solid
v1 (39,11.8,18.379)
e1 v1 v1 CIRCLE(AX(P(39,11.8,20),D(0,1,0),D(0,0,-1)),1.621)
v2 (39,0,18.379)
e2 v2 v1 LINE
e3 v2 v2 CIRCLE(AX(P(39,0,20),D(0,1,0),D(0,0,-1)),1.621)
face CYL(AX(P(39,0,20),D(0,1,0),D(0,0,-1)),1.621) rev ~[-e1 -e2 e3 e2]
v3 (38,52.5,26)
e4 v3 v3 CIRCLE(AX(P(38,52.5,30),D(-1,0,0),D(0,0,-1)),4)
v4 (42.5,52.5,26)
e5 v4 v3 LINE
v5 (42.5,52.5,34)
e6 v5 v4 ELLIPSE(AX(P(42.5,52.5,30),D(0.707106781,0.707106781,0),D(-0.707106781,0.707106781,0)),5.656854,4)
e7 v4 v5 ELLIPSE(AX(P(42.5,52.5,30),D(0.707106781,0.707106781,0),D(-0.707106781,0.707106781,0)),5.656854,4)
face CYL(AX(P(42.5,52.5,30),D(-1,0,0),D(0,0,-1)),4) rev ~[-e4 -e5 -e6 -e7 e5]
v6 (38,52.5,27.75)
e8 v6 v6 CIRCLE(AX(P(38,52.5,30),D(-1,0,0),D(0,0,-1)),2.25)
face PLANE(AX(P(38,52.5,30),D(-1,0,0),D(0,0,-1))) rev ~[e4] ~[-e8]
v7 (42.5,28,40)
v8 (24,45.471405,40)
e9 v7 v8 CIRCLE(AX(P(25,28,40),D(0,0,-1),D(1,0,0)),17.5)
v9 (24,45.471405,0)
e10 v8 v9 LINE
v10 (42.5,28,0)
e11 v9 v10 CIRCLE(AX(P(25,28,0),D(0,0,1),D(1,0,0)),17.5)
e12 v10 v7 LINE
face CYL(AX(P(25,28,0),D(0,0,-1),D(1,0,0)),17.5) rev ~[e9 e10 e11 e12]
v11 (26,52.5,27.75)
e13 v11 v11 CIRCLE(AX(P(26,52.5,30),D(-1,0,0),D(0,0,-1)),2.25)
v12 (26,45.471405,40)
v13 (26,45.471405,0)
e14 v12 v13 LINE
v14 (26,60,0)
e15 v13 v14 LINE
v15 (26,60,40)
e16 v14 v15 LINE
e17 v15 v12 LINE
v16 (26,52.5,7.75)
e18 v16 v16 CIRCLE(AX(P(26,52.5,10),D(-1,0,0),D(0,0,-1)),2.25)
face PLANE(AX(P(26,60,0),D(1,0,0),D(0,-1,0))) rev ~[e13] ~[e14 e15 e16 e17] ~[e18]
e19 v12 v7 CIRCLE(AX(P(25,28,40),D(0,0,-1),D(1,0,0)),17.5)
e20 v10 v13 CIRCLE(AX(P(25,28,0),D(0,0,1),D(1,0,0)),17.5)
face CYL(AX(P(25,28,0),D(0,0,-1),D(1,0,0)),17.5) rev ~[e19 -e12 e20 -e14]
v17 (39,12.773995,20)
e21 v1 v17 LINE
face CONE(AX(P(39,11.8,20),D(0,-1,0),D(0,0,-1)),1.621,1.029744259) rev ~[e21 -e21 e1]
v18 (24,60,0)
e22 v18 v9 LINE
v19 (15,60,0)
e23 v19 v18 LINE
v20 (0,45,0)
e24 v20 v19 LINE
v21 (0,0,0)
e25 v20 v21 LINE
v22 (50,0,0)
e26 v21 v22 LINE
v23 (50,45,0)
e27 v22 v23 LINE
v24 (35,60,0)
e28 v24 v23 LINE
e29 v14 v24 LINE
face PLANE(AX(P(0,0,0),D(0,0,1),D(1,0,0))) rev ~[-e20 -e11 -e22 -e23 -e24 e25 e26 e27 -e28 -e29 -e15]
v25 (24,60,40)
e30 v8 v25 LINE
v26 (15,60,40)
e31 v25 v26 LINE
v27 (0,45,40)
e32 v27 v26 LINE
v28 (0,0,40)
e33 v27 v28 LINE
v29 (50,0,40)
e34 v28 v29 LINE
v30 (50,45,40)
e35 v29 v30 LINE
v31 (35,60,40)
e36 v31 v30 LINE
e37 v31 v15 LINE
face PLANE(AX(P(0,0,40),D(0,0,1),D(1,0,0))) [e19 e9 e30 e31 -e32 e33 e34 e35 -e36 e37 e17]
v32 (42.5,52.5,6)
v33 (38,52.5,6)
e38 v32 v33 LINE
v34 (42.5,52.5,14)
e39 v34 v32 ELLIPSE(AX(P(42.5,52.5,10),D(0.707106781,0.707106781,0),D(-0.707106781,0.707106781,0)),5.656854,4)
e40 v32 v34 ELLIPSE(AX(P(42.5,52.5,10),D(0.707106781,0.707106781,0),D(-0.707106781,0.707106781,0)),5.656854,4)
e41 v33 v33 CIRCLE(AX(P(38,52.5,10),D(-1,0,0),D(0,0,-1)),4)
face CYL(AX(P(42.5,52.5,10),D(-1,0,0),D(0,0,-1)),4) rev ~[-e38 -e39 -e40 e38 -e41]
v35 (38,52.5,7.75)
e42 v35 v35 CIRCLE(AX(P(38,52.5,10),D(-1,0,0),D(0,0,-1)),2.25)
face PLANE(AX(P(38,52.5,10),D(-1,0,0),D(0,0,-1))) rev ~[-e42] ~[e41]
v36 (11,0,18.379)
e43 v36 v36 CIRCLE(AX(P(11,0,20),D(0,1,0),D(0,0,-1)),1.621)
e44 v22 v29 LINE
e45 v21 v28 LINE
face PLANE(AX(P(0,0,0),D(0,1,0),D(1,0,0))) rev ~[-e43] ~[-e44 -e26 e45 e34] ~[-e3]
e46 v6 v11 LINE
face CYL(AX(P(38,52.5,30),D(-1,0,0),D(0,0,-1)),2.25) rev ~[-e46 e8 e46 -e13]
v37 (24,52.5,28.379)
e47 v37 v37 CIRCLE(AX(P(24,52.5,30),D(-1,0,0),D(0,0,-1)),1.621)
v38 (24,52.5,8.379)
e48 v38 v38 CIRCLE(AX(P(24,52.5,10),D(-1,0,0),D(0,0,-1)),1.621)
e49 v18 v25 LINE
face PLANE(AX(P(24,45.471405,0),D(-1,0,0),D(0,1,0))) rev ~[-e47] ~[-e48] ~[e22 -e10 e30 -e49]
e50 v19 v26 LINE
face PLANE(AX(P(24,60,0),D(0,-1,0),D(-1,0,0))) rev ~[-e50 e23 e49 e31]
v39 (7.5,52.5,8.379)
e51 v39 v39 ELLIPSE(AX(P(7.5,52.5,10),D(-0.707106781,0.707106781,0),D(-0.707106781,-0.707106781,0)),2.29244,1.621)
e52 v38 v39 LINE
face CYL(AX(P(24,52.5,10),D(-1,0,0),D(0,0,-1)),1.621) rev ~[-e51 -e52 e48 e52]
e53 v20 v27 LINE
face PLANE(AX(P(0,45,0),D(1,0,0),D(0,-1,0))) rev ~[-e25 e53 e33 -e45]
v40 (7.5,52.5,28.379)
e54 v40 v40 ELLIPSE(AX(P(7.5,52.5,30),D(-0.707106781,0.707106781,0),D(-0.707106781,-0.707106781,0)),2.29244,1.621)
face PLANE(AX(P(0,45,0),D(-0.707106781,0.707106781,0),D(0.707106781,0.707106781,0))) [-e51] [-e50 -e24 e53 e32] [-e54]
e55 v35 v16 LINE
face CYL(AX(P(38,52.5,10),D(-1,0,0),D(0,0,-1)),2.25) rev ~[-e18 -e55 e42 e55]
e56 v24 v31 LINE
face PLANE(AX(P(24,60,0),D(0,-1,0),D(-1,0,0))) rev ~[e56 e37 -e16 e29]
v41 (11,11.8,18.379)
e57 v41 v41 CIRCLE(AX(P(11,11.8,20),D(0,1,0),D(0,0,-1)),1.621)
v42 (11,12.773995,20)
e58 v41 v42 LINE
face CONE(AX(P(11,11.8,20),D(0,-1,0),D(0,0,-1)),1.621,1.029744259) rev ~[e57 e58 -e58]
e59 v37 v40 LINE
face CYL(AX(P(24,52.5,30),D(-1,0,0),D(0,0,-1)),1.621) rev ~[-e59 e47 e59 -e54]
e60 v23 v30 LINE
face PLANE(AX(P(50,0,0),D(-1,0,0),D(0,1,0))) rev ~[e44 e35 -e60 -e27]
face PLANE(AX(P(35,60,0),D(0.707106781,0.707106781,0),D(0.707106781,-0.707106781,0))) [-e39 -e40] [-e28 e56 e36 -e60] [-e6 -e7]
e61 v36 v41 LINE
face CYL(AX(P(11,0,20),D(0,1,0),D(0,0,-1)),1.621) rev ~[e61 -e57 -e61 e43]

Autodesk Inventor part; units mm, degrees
sketch "Skizze1" plane through (0, 0, 0) normal (0, 0, 1) x (1, 0, 0)
  line L0 (0, 0) -> (50, 0)
  line L1 (50, 0) -> (50, 45)
  line L2 (35, 60) -> (15, 60)
  line L3 (0, 45) -> (0, 0)
  circle A0 centre (25, 28) radius 17.5
  line L4 (25, 28) -> (25, 0) construction
  line L5 (0, 45) -> (15, 60)
  line L6 (35, 60) -> (50, 45)
  line L7 (24, 60) -> (26, 60)
  line L8 (26, 60) -> (26, 28)
  line L9 (26, 28) -> (24, 28)
  line L10 (24, 28) -> (24, 60)
  point P0 (50, 60)
  point P1 (0, 60)
  point P2 (25, 60)
  dimension "d0" = 50
  dimension "d1" = 35
  dimension "d2" = 60
  dimension "d3" = 15
  dimension "d4" = 15
  dimension "d5" = 15
  dimension "d6" = 15
  dimension "d7" = 28
  dimension "d10" = 2
extrude "Extrusion1" add sketch "Skizze1" along normal blind 40 contours L3 L5 L2 L10 A0 L8 L6 L1 L0 | L2 L8 A0 L10
extrude "Extrusion2" cut sketch "Skizze1" along normal up to surface (40 mm away) contours L2 L8 A0 L10 | A0 L8 L9 L10 picked at (24.8888, 33.8323)
sketch "Skizze2" plane through (0, 0, 0) normal (0, -1, 0) x (1, 0, 0)
  line L0 (0, 0) -> (0, 40) construction
  line L1 (50, 0) -> (50, 40) construction
  line L2 (0, 40) -> (50, 40) construction
  line L3 (0, 0) -> (0, 40) construction
  line L4 (25, 20) -> (25, 40) construction
  line L5 (7.5, 40) -> (42.5, 40) construction
  line L6 (11, 20) -> (39, 20) construction
  point P0 (26, 40)
  point P1 (24, 40)
  point P2 (0, 20)
  dimension "d13" = 28
hole "Bohrung1" at (11, 0, 20) at (39, 0, 20) direction (0, 1, 0) diameter 3.242 depth 11.8 tip angle 118 thread size "M4x0.7" class "6H" standard "ISO Metric profile"
ref_plane "Arbeitsebene1" through (42.5, 0, 0) normal (1, 0, 0) x (0, 0, -1)
sketch "Skizze3" plane through (42.5, 0, 0) normal (1, 0, 0) x (0, 0, -1)
  line L0 (0, 60) -> (-40, 60) construction
  line L1 (0, 45) -> (-40, 45) construction
  line L2 (-40, 45) -> (-40, 60) construction
  line L3 (-40, 52.5) -> (0, 52.5) construction
  line L4 (0, 45) -> (0, 60) construction
  point P0 (0, 0)
  point P1 (-20, 52.5)
  point P2 (-30, 52.5)
  point P3 (-10, 52.5)
  dimension "d44" = 10
  dimension "d45" = 10
ref_plane "Arbeitsebene2" through (0, 0, 20) normal (0, 0, 1) x (1, 0, 0)
ref_plane "Arbeitsebene3" through (0, 0, 30) normal (0, 0, 1) x (1, 0, 0)
ref_plane "Arbeitsebene4" through (0, 0, 10) normal (0, 0, -1) x (-1, 0, 0)
sketch "Skizze5" plane through (50, 0, 40) normal (1, 0, 0) x (0, 0, -1)
  line L0 (20, -12) -> (20, 72) construction
  line L1 (10, -12) -> (10, 72) construction
  line L2 (30, 72) -> (30, -12) construction
  point P0 (40, 0)
  dimension "Hole_Dist2Center" = 10
  dimension "d37" = 10
hole "Bohrung2" at (42.5, 52.5, 30) at (42.5, 52.5, 10) direction (-1, 0, 0) diameter 4.5 depth 18.5 counterbore diameter 8 counterbore depth 4.5 clearance for "Inbusschraube DIN EN ISO 4762" size "M4" standard "DIN"
delete faces "Fläche löschen1" heal yes whole lump no faces at (42.5, 52.1809, 31.2946) (42.5, 50.9777, 9.002)
sketch "Skizze4" plane through (24, 45.4714, 0) normal (1, 0, 0) x (0, 0, -1)
  line L0 (-20, 7.0286) -> (-30, 7.0286) construction
  line L1 (-30, -57.4714) -> (-30, 26.5286) construction
  line L2 (-10, 26.5286) -> (-10, -57.4714) construction
  point P0 (0, -45.4714)
  point P1 (-10, 7.0286)
hole "Bohrung3" at (24, 52.5, 30) at (24, 52.5, 10) direction (-1, 0, 0) diameter 3.242 end through all thread size "M4x0.7" class "6H" standard "ISO Metric profile"
equation "\"d0\" = Fixation_Width"
equation "\"d4\" = d3"
equation "\"d5\" = d3"
equation "\"d6\" = d5"
equation "\"d8\" = Fixation_Thickness"
equation "\"d11\" = Fixation_Thickness"
equation "\"d13\" = FixationHole_Dist"
equation "\"d44\" = Hole_Dist2Center"
equation "\"d45\" = d44"
equation "\"Fixation_Thickness\" = 40"
equation "\"Fixation_Width\" = 50"
equation "\"FixationHole_Dist\" = 28"
equation "\"d21\" = -0.5 * d5"
properties part number "Motor_MainAxis_Fixation_Holder"
